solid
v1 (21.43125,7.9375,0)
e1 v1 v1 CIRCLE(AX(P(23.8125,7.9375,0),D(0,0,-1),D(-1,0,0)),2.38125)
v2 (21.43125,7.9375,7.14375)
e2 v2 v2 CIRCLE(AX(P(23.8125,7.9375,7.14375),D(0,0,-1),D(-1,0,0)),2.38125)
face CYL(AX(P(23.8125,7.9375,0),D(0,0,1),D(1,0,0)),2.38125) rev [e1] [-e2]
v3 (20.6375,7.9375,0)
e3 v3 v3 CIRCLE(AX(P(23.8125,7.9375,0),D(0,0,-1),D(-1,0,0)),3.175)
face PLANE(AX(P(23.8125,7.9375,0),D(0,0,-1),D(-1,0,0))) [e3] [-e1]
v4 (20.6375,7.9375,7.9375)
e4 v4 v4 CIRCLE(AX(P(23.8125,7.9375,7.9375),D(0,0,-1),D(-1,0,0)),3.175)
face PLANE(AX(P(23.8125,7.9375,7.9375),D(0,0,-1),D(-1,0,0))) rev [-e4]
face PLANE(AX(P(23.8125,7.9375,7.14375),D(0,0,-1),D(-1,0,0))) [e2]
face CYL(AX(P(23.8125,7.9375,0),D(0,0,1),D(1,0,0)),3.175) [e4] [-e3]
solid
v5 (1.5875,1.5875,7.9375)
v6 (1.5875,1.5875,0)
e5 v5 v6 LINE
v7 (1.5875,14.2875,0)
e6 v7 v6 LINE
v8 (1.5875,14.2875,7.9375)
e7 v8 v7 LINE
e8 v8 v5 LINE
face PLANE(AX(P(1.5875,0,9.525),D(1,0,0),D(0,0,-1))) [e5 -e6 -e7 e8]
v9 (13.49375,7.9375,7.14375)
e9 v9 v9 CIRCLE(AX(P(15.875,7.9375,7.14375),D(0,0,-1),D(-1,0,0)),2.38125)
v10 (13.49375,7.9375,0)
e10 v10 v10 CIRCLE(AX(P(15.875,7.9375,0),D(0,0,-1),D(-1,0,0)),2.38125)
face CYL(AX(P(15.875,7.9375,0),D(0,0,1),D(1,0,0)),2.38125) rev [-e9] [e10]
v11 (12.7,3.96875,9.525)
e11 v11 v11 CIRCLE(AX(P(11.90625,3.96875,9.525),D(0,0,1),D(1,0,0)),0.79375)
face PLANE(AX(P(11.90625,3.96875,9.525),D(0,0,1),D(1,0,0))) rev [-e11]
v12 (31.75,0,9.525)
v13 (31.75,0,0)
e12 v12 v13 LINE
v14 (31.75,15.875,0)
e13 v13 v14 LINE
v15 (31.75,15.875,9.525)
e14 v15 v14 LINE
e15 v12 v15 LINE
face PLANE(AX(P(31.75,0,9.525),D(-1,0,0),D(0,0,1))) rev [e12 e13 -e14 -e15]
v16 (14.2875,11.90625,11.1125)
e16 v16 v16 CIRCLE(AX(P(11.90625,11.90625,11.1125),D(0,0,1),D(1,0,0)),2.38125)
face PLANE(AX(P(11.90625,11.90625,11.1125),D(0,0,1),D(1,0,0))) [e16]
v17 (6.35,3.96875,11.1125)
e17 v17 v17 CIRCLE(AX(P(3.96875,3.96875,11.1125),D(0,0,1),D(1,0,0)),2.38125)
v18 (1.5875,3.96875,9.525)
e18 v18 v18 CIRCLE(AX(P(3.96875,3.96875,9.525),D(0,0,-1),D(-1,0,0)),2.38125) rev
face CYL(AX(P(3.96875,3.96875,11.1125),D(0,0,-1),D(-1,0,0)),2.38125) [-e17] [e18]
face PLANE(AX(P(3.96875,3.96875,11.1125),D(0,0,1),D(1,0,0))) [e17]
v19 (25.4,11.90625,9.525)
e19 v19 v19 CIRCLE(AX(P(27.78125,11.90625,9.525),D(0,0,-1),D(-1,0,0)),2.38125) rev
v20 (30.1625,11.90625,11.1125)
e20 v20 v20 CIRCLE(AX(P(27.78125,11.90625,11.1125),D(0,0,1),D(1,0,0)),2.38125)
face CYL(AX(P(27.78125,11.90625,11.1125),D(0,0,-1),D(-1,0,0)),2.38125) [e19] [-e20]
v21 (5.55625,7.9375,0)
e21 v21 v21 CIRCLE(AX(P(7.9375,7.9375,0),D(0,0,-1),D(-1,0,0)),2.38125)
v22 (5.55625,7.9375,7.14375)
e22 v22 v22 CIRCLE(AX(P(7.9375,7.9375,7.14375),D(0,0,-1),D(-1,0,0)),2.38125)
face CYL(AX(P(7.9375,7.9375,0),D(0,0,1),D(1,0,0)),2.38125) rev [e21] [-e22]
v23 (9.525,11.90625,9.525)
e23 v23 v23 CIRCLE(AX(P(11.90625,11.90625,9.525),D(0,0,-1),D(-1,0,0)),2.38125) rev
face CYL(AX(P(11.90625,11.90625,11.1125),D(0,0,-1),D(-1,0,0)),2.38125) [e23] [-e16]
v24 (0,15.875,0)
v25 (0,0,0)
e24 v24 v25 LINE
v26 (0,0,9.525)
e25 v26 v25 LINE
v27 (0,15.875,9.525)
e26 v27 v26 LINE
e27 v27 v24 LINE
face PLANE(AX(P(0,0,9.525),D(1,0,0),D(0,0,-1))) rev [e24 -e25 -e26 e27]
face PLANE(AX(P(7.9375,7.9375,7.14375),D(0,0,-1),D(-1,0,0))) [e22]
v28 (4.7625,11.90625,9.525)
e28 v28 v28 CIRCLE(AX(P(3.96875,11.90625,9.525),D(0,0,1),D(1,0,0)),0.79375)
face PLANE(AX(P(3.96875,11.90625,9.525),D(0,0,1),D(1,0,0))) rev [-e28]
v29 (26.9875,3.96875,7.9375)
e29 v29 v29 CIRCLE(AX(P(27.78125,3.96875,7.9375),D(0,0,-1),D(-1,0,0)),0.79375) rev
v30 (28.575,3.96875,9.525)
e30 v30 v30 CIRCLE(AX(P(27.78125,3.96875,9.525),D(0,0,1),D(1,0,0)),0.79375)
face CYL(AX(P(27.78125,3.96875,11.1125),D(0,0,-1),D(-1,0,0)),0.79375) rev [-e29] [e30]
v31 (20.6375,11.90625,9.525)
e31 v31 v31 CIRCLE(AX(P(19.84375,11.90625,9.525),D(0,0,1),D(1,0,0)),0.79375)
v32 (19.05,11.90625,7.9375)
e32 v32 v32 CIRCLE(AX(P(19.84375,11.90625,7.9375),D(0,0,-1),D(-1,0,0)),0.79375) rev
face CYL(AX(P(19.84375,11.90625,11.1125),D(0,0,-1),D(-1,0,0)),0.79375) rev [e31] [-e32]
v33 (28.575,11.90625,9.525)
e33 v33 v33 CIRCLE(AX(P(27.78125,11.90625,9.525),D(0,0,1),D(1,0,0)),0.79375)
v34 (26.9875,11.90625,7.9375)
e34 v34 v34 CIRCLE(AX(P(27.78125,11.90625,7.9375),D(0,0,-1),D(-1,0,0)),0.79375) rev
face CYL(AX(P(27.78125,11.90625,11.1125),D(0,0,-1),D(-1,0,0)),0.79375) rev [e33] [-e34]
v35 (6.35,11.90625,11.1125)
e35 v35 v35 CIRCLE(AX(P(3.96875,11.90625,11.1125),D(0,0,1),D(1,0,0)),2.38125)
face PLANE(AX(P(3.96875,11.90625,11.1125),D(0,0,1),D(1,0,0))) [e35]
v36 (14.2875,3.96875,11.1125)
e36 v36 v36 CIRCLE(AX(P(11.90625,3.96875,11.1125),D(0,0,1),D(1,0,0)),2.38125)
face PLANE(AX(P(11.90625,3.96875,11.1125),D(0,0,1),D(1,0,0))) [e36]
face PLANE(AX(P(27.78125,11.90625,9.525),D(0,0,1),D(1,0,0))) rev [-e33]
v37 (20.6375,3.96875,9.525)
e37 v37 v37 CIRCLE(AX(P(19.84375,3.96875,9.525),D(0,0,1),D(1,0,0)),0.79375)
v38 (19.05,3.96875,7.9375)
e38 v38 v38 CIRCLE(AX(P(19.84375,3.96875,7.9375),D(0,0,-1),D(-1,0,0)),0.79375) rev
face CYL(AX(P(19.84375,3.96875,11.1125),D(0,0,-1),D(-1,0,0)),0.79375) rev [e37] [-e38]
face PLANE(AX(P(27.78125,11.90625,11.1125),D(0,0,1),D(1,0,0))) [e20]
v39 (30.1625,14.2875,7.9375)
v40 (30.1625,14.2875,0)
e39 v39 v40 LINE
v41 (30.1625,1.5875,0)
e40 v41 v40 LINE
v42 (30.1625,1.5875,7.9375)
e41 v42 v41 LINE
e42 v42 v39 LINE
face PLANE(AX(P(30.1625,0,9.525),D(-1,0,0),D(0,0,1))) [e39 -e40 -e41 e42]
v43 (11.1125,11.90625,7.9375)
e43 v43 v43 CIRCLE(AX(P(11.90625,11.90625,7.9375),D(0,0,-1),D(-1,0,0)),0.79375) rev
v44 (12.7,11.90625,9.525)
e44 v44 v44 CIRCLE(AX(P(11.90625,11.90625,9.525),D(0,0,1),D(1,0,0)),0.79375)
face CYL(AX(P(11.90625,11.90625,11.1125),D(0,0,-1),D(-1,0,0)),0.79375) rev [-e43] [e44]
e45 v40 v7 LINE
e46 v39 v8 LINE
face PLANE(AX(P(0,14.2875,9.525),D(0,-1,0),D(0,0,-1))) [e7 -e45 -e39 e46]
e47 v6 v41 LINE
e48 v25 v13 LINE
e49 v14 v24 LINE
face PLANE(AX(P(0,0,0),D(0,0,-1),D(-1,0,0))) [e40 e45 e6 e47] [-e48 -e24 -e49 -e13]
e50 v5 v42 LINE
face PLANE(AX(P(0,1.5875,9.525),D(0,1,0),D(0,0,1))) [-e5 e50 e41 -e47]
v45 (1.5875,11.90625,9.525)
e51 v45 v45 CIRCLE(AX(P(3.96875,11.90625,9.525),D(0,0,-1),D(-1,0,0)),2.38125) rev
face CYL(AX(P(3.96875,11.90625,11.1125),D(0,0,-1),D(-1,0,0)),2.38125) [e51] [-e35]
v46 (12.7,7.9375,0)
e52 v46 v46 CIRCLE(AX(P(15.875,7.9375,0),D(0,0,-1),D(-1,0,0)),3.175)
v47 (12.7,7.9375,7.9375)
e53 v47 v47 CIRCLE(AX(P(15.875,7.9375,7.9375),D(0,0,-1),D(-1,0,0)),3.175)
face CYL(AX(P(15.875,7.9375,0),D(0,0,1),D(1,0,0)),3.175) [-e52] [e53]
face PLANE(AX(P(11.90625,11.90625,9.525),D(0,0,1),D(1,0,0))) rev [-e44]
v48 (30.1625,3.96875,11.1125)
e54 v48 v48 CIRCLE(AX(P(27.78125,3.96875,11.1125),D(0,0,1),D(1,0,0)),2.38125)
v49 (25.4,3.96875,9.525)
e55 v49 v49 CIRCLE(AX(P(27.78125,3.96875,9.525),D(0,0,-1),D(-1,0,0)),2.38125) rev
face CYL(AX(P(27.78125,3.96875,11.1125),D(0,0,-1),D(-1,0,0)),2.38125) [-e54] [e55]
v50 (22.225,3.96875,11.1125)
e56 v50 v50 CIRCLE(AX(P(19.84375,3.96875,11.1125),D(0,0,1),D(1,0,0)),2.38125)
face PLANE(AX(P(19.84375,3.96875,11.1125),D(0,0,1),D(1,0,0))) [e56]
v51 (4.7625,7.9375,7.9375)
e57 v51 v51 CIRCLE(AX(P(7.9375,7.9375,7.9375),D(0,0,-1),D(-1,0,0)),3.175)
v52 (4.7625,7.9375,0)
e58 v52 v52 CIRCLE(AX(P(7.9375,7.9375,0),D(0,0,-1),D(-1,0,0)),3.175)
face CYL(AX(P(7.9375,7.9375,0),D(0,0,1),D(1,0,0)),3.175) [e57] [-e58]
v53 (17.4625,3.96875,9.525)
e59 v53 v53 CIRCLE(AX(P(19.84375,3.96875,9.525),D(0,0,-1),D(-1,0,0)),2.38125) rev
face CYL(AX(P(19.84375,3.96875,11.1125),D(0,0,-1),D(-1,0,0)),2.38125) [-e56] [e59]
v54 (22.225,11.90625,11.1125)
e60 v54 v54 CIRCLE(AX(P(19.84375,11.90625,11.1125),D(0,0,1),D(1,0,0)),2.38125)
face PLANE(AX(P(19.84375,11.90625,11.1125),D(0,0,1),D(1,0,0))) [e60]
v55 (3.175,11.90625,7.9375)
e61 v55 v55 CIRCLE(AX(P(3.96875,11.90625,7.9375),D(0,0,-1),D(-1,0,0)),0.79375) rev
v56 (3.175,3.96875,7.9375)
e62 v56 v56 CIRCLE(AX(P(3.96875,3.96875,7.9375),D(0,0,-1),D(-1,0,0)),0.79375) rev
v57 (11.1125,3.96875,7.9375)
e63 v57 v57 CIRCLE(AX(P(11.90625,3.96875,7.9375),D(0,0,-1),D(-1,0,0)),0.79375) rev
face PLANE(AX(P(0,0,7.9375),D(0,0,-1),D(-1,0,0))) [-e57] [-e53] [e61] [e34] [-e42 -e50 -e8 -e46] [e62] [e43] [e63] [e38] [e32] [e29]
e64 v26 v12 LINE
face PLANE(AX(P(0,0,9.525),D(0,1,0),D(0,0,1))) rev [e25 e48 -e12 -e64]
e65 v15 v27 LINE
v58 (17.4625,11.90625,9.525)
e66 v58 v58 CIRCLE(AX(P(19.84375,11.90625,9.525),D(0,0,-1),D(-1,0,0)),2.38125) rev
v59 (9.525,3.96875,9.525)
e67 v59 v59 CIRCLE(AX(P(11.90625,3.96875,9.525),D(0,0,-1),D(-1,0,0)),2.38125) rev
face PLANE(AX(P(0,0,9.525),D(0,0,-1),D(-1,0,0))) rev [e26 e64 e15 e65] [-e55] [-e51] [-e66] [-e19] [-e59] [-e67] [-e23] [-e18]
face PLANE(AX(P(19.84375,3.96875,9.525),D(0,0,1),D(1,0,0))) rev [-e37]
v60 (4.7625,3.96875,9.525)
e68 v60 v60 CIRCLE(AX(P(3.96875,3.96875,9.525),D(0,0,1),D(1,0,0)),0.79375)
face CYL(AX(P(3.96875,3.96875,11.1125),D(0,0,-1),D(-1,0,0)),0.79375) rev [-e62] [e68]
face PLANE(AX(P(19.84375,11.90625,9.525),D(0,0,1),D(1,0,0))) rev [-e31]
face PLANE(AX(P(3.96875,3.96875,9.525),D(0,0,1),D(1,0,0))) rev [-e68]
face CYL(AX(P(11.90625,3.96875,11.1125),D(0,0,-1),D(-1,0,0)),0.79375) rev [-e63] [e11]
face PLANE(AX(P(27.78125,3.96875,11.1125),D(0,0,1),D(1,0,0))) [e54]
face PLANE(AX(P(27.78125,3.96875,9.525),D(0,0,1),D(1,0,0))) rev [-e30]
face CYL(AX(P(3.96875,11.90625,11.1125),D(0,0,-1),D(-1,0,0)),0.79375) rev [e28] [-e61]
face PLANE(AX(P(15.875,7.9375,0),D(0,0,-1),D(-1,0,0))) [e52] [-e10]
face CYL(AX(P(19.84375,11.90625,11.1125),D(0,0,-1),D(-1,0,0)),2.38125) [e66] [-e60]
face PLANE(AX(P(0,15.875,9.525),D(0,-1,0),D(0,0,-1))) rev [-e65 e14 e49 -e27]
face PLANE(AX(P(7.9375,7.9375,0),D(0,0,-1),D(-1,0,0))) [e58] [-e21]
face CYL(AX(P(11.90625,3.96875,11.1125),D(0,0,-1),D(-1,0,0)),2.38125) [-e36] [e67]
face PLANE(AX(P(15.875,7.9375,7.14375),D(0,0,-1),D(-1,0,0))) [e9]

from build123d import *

# Parameters (mm, degrees)
SKETCH1_W              = 31.75
SKETCH1_H              = 15.875
MAIN_BRICK_DEPTH       = 9.525
SKETCH2_R              = 2.38125
PEG_DEPTH              = 1.5875
PEG_PATTERN_COUNT      = 2
PEG_PATTERN_PITCH      = 7.9375
PEG_PATTERN_COUNT_DIR2 = 4
PEG_PATTERN_PITCH_DIR2 = 7.9375
SHELL_BRICK_T          = -1.5875
SKETCH3_R              = 3.175
BOSS_EXTRUDE5_DEPTH    = 7.9375
SHELL9_T               = -0.79375
LPATTERN7_OUTLINE_R    = 3.175
LPATTERN7_OUTLINE_R_2  = 2.38125
LPATTERN7_DEPTH        = 7.9375
LPATTERN7_START        = 7.14375
LPATTERN7_2_OUTLINE_R  = 2.38125
LPATTERN7_2_DEPTH      = 0.79375


# Read off the part's stored shape, not the designer's step: LPattern7
with BuildPart() as part:
    # Sketch1 → Main-Brick (new body)
    with BuildSketch(Plane.XY):
        with Locations((15.875, 7.9375)):
            Rectangle(SKETCH1_W, SKETCH1_H)
    extrude(amount=MAIN_BRICK_DEPTH)

    # Sketch2 → Peg (add)
    with BuildSketch(Plane.XY.offset(9.525)):
        with Locations(Location((3.96875, 11.90625, 0), (0, 0, 180))):
            Circle(SKETCH2_R)
    peg = extrude(amount=PEG_DEPTH)

    # Peg Pattern: Peg 2 × 4
    with Locations(*[(j * PEG_PATTERN_PITCH_DIR2, -i * PEG_PATTERN_PITCH, 0) for i in range(PEG_PATTERN_COUNT) for j in range(PEG_PATTERN_COUNT_DIR2) if (i, j) != (0, 0)]):
        add(peg)

    # Shell-Brick
    shell_brick_openings = [part.faces().sort_by_distance(p)[0] for p in [
        (15.875, 7.9375, 0),
    ]]
    offset(amount=SHELL_BRICK_T, openings=shell_brick_openings, kind=Kind.INTERSECTION)

    # LPattern7 outline → LPattern7 (add)
    # profile 1 of 2: a face of its own
    with BuildSketch(Plane.XY):
        with Locations((15.875, 7.9375)):
            Circle(LPATTERN7_OUTLINE_R)
        with Locations((15.875, 7.9375)):
            Circle(LPATTERN7_OUTLINE_R_2, mode=Mode.SUBTRACT)
    # profile 2 of 2: a face of its own
    with BuildSketch(Plane.XY):
        with Locations((7.9375, 7.9375)):
            Circle(LPATTERN7_OUTLINE_R)
        with Locations((7.9375, 7.9375)):
            Circle(LPATTERN7_OUTLINE_R_2, mode=Mode.SUBTRACT)
    extrude(amount=LPATTERN7_DEPTH)

    # LPattern7 2 outline → LPattern7 2 (add)
    with BuildSketch(Plane.XY.offset(LPATTERN7_START)):
        with Locations((15.875, 7.9375)):
            Circle(LPATTERN7_2_OUTLINE_R)
        with Locations((7.9375, 7.9375)):
            Circle(LPATTERN7_2_OUTLINE_R)
    extrude(amount=LPATTERN7_2_DEPTH)


with BuildPart() as body_2:
    # Sketch3 → Boss-Extrude5 (new body)
    with BuildSketch(Plane(origin=(0, 0, 7.9375), x_dir=(-1, 0, 0), z_dir=(0, 0, -1))):
        with Locations((-23.8125, 7.9375)):
            Circle(SKETCH3_R)
    extrude(amount=BOSS_EXTRUDE5_DEPTH)

    # Shell9
    shell9_openings = [body_2.faces().sort_by_distance(p)[0] for p in [
        (23.8125, 7.9375, 0),
    ]]
    offset(amount=SHELL9_T, openings=shell9_openings, kind=Kind.INTERSECTION)


solid = Compound([part.part, body_2.part])
